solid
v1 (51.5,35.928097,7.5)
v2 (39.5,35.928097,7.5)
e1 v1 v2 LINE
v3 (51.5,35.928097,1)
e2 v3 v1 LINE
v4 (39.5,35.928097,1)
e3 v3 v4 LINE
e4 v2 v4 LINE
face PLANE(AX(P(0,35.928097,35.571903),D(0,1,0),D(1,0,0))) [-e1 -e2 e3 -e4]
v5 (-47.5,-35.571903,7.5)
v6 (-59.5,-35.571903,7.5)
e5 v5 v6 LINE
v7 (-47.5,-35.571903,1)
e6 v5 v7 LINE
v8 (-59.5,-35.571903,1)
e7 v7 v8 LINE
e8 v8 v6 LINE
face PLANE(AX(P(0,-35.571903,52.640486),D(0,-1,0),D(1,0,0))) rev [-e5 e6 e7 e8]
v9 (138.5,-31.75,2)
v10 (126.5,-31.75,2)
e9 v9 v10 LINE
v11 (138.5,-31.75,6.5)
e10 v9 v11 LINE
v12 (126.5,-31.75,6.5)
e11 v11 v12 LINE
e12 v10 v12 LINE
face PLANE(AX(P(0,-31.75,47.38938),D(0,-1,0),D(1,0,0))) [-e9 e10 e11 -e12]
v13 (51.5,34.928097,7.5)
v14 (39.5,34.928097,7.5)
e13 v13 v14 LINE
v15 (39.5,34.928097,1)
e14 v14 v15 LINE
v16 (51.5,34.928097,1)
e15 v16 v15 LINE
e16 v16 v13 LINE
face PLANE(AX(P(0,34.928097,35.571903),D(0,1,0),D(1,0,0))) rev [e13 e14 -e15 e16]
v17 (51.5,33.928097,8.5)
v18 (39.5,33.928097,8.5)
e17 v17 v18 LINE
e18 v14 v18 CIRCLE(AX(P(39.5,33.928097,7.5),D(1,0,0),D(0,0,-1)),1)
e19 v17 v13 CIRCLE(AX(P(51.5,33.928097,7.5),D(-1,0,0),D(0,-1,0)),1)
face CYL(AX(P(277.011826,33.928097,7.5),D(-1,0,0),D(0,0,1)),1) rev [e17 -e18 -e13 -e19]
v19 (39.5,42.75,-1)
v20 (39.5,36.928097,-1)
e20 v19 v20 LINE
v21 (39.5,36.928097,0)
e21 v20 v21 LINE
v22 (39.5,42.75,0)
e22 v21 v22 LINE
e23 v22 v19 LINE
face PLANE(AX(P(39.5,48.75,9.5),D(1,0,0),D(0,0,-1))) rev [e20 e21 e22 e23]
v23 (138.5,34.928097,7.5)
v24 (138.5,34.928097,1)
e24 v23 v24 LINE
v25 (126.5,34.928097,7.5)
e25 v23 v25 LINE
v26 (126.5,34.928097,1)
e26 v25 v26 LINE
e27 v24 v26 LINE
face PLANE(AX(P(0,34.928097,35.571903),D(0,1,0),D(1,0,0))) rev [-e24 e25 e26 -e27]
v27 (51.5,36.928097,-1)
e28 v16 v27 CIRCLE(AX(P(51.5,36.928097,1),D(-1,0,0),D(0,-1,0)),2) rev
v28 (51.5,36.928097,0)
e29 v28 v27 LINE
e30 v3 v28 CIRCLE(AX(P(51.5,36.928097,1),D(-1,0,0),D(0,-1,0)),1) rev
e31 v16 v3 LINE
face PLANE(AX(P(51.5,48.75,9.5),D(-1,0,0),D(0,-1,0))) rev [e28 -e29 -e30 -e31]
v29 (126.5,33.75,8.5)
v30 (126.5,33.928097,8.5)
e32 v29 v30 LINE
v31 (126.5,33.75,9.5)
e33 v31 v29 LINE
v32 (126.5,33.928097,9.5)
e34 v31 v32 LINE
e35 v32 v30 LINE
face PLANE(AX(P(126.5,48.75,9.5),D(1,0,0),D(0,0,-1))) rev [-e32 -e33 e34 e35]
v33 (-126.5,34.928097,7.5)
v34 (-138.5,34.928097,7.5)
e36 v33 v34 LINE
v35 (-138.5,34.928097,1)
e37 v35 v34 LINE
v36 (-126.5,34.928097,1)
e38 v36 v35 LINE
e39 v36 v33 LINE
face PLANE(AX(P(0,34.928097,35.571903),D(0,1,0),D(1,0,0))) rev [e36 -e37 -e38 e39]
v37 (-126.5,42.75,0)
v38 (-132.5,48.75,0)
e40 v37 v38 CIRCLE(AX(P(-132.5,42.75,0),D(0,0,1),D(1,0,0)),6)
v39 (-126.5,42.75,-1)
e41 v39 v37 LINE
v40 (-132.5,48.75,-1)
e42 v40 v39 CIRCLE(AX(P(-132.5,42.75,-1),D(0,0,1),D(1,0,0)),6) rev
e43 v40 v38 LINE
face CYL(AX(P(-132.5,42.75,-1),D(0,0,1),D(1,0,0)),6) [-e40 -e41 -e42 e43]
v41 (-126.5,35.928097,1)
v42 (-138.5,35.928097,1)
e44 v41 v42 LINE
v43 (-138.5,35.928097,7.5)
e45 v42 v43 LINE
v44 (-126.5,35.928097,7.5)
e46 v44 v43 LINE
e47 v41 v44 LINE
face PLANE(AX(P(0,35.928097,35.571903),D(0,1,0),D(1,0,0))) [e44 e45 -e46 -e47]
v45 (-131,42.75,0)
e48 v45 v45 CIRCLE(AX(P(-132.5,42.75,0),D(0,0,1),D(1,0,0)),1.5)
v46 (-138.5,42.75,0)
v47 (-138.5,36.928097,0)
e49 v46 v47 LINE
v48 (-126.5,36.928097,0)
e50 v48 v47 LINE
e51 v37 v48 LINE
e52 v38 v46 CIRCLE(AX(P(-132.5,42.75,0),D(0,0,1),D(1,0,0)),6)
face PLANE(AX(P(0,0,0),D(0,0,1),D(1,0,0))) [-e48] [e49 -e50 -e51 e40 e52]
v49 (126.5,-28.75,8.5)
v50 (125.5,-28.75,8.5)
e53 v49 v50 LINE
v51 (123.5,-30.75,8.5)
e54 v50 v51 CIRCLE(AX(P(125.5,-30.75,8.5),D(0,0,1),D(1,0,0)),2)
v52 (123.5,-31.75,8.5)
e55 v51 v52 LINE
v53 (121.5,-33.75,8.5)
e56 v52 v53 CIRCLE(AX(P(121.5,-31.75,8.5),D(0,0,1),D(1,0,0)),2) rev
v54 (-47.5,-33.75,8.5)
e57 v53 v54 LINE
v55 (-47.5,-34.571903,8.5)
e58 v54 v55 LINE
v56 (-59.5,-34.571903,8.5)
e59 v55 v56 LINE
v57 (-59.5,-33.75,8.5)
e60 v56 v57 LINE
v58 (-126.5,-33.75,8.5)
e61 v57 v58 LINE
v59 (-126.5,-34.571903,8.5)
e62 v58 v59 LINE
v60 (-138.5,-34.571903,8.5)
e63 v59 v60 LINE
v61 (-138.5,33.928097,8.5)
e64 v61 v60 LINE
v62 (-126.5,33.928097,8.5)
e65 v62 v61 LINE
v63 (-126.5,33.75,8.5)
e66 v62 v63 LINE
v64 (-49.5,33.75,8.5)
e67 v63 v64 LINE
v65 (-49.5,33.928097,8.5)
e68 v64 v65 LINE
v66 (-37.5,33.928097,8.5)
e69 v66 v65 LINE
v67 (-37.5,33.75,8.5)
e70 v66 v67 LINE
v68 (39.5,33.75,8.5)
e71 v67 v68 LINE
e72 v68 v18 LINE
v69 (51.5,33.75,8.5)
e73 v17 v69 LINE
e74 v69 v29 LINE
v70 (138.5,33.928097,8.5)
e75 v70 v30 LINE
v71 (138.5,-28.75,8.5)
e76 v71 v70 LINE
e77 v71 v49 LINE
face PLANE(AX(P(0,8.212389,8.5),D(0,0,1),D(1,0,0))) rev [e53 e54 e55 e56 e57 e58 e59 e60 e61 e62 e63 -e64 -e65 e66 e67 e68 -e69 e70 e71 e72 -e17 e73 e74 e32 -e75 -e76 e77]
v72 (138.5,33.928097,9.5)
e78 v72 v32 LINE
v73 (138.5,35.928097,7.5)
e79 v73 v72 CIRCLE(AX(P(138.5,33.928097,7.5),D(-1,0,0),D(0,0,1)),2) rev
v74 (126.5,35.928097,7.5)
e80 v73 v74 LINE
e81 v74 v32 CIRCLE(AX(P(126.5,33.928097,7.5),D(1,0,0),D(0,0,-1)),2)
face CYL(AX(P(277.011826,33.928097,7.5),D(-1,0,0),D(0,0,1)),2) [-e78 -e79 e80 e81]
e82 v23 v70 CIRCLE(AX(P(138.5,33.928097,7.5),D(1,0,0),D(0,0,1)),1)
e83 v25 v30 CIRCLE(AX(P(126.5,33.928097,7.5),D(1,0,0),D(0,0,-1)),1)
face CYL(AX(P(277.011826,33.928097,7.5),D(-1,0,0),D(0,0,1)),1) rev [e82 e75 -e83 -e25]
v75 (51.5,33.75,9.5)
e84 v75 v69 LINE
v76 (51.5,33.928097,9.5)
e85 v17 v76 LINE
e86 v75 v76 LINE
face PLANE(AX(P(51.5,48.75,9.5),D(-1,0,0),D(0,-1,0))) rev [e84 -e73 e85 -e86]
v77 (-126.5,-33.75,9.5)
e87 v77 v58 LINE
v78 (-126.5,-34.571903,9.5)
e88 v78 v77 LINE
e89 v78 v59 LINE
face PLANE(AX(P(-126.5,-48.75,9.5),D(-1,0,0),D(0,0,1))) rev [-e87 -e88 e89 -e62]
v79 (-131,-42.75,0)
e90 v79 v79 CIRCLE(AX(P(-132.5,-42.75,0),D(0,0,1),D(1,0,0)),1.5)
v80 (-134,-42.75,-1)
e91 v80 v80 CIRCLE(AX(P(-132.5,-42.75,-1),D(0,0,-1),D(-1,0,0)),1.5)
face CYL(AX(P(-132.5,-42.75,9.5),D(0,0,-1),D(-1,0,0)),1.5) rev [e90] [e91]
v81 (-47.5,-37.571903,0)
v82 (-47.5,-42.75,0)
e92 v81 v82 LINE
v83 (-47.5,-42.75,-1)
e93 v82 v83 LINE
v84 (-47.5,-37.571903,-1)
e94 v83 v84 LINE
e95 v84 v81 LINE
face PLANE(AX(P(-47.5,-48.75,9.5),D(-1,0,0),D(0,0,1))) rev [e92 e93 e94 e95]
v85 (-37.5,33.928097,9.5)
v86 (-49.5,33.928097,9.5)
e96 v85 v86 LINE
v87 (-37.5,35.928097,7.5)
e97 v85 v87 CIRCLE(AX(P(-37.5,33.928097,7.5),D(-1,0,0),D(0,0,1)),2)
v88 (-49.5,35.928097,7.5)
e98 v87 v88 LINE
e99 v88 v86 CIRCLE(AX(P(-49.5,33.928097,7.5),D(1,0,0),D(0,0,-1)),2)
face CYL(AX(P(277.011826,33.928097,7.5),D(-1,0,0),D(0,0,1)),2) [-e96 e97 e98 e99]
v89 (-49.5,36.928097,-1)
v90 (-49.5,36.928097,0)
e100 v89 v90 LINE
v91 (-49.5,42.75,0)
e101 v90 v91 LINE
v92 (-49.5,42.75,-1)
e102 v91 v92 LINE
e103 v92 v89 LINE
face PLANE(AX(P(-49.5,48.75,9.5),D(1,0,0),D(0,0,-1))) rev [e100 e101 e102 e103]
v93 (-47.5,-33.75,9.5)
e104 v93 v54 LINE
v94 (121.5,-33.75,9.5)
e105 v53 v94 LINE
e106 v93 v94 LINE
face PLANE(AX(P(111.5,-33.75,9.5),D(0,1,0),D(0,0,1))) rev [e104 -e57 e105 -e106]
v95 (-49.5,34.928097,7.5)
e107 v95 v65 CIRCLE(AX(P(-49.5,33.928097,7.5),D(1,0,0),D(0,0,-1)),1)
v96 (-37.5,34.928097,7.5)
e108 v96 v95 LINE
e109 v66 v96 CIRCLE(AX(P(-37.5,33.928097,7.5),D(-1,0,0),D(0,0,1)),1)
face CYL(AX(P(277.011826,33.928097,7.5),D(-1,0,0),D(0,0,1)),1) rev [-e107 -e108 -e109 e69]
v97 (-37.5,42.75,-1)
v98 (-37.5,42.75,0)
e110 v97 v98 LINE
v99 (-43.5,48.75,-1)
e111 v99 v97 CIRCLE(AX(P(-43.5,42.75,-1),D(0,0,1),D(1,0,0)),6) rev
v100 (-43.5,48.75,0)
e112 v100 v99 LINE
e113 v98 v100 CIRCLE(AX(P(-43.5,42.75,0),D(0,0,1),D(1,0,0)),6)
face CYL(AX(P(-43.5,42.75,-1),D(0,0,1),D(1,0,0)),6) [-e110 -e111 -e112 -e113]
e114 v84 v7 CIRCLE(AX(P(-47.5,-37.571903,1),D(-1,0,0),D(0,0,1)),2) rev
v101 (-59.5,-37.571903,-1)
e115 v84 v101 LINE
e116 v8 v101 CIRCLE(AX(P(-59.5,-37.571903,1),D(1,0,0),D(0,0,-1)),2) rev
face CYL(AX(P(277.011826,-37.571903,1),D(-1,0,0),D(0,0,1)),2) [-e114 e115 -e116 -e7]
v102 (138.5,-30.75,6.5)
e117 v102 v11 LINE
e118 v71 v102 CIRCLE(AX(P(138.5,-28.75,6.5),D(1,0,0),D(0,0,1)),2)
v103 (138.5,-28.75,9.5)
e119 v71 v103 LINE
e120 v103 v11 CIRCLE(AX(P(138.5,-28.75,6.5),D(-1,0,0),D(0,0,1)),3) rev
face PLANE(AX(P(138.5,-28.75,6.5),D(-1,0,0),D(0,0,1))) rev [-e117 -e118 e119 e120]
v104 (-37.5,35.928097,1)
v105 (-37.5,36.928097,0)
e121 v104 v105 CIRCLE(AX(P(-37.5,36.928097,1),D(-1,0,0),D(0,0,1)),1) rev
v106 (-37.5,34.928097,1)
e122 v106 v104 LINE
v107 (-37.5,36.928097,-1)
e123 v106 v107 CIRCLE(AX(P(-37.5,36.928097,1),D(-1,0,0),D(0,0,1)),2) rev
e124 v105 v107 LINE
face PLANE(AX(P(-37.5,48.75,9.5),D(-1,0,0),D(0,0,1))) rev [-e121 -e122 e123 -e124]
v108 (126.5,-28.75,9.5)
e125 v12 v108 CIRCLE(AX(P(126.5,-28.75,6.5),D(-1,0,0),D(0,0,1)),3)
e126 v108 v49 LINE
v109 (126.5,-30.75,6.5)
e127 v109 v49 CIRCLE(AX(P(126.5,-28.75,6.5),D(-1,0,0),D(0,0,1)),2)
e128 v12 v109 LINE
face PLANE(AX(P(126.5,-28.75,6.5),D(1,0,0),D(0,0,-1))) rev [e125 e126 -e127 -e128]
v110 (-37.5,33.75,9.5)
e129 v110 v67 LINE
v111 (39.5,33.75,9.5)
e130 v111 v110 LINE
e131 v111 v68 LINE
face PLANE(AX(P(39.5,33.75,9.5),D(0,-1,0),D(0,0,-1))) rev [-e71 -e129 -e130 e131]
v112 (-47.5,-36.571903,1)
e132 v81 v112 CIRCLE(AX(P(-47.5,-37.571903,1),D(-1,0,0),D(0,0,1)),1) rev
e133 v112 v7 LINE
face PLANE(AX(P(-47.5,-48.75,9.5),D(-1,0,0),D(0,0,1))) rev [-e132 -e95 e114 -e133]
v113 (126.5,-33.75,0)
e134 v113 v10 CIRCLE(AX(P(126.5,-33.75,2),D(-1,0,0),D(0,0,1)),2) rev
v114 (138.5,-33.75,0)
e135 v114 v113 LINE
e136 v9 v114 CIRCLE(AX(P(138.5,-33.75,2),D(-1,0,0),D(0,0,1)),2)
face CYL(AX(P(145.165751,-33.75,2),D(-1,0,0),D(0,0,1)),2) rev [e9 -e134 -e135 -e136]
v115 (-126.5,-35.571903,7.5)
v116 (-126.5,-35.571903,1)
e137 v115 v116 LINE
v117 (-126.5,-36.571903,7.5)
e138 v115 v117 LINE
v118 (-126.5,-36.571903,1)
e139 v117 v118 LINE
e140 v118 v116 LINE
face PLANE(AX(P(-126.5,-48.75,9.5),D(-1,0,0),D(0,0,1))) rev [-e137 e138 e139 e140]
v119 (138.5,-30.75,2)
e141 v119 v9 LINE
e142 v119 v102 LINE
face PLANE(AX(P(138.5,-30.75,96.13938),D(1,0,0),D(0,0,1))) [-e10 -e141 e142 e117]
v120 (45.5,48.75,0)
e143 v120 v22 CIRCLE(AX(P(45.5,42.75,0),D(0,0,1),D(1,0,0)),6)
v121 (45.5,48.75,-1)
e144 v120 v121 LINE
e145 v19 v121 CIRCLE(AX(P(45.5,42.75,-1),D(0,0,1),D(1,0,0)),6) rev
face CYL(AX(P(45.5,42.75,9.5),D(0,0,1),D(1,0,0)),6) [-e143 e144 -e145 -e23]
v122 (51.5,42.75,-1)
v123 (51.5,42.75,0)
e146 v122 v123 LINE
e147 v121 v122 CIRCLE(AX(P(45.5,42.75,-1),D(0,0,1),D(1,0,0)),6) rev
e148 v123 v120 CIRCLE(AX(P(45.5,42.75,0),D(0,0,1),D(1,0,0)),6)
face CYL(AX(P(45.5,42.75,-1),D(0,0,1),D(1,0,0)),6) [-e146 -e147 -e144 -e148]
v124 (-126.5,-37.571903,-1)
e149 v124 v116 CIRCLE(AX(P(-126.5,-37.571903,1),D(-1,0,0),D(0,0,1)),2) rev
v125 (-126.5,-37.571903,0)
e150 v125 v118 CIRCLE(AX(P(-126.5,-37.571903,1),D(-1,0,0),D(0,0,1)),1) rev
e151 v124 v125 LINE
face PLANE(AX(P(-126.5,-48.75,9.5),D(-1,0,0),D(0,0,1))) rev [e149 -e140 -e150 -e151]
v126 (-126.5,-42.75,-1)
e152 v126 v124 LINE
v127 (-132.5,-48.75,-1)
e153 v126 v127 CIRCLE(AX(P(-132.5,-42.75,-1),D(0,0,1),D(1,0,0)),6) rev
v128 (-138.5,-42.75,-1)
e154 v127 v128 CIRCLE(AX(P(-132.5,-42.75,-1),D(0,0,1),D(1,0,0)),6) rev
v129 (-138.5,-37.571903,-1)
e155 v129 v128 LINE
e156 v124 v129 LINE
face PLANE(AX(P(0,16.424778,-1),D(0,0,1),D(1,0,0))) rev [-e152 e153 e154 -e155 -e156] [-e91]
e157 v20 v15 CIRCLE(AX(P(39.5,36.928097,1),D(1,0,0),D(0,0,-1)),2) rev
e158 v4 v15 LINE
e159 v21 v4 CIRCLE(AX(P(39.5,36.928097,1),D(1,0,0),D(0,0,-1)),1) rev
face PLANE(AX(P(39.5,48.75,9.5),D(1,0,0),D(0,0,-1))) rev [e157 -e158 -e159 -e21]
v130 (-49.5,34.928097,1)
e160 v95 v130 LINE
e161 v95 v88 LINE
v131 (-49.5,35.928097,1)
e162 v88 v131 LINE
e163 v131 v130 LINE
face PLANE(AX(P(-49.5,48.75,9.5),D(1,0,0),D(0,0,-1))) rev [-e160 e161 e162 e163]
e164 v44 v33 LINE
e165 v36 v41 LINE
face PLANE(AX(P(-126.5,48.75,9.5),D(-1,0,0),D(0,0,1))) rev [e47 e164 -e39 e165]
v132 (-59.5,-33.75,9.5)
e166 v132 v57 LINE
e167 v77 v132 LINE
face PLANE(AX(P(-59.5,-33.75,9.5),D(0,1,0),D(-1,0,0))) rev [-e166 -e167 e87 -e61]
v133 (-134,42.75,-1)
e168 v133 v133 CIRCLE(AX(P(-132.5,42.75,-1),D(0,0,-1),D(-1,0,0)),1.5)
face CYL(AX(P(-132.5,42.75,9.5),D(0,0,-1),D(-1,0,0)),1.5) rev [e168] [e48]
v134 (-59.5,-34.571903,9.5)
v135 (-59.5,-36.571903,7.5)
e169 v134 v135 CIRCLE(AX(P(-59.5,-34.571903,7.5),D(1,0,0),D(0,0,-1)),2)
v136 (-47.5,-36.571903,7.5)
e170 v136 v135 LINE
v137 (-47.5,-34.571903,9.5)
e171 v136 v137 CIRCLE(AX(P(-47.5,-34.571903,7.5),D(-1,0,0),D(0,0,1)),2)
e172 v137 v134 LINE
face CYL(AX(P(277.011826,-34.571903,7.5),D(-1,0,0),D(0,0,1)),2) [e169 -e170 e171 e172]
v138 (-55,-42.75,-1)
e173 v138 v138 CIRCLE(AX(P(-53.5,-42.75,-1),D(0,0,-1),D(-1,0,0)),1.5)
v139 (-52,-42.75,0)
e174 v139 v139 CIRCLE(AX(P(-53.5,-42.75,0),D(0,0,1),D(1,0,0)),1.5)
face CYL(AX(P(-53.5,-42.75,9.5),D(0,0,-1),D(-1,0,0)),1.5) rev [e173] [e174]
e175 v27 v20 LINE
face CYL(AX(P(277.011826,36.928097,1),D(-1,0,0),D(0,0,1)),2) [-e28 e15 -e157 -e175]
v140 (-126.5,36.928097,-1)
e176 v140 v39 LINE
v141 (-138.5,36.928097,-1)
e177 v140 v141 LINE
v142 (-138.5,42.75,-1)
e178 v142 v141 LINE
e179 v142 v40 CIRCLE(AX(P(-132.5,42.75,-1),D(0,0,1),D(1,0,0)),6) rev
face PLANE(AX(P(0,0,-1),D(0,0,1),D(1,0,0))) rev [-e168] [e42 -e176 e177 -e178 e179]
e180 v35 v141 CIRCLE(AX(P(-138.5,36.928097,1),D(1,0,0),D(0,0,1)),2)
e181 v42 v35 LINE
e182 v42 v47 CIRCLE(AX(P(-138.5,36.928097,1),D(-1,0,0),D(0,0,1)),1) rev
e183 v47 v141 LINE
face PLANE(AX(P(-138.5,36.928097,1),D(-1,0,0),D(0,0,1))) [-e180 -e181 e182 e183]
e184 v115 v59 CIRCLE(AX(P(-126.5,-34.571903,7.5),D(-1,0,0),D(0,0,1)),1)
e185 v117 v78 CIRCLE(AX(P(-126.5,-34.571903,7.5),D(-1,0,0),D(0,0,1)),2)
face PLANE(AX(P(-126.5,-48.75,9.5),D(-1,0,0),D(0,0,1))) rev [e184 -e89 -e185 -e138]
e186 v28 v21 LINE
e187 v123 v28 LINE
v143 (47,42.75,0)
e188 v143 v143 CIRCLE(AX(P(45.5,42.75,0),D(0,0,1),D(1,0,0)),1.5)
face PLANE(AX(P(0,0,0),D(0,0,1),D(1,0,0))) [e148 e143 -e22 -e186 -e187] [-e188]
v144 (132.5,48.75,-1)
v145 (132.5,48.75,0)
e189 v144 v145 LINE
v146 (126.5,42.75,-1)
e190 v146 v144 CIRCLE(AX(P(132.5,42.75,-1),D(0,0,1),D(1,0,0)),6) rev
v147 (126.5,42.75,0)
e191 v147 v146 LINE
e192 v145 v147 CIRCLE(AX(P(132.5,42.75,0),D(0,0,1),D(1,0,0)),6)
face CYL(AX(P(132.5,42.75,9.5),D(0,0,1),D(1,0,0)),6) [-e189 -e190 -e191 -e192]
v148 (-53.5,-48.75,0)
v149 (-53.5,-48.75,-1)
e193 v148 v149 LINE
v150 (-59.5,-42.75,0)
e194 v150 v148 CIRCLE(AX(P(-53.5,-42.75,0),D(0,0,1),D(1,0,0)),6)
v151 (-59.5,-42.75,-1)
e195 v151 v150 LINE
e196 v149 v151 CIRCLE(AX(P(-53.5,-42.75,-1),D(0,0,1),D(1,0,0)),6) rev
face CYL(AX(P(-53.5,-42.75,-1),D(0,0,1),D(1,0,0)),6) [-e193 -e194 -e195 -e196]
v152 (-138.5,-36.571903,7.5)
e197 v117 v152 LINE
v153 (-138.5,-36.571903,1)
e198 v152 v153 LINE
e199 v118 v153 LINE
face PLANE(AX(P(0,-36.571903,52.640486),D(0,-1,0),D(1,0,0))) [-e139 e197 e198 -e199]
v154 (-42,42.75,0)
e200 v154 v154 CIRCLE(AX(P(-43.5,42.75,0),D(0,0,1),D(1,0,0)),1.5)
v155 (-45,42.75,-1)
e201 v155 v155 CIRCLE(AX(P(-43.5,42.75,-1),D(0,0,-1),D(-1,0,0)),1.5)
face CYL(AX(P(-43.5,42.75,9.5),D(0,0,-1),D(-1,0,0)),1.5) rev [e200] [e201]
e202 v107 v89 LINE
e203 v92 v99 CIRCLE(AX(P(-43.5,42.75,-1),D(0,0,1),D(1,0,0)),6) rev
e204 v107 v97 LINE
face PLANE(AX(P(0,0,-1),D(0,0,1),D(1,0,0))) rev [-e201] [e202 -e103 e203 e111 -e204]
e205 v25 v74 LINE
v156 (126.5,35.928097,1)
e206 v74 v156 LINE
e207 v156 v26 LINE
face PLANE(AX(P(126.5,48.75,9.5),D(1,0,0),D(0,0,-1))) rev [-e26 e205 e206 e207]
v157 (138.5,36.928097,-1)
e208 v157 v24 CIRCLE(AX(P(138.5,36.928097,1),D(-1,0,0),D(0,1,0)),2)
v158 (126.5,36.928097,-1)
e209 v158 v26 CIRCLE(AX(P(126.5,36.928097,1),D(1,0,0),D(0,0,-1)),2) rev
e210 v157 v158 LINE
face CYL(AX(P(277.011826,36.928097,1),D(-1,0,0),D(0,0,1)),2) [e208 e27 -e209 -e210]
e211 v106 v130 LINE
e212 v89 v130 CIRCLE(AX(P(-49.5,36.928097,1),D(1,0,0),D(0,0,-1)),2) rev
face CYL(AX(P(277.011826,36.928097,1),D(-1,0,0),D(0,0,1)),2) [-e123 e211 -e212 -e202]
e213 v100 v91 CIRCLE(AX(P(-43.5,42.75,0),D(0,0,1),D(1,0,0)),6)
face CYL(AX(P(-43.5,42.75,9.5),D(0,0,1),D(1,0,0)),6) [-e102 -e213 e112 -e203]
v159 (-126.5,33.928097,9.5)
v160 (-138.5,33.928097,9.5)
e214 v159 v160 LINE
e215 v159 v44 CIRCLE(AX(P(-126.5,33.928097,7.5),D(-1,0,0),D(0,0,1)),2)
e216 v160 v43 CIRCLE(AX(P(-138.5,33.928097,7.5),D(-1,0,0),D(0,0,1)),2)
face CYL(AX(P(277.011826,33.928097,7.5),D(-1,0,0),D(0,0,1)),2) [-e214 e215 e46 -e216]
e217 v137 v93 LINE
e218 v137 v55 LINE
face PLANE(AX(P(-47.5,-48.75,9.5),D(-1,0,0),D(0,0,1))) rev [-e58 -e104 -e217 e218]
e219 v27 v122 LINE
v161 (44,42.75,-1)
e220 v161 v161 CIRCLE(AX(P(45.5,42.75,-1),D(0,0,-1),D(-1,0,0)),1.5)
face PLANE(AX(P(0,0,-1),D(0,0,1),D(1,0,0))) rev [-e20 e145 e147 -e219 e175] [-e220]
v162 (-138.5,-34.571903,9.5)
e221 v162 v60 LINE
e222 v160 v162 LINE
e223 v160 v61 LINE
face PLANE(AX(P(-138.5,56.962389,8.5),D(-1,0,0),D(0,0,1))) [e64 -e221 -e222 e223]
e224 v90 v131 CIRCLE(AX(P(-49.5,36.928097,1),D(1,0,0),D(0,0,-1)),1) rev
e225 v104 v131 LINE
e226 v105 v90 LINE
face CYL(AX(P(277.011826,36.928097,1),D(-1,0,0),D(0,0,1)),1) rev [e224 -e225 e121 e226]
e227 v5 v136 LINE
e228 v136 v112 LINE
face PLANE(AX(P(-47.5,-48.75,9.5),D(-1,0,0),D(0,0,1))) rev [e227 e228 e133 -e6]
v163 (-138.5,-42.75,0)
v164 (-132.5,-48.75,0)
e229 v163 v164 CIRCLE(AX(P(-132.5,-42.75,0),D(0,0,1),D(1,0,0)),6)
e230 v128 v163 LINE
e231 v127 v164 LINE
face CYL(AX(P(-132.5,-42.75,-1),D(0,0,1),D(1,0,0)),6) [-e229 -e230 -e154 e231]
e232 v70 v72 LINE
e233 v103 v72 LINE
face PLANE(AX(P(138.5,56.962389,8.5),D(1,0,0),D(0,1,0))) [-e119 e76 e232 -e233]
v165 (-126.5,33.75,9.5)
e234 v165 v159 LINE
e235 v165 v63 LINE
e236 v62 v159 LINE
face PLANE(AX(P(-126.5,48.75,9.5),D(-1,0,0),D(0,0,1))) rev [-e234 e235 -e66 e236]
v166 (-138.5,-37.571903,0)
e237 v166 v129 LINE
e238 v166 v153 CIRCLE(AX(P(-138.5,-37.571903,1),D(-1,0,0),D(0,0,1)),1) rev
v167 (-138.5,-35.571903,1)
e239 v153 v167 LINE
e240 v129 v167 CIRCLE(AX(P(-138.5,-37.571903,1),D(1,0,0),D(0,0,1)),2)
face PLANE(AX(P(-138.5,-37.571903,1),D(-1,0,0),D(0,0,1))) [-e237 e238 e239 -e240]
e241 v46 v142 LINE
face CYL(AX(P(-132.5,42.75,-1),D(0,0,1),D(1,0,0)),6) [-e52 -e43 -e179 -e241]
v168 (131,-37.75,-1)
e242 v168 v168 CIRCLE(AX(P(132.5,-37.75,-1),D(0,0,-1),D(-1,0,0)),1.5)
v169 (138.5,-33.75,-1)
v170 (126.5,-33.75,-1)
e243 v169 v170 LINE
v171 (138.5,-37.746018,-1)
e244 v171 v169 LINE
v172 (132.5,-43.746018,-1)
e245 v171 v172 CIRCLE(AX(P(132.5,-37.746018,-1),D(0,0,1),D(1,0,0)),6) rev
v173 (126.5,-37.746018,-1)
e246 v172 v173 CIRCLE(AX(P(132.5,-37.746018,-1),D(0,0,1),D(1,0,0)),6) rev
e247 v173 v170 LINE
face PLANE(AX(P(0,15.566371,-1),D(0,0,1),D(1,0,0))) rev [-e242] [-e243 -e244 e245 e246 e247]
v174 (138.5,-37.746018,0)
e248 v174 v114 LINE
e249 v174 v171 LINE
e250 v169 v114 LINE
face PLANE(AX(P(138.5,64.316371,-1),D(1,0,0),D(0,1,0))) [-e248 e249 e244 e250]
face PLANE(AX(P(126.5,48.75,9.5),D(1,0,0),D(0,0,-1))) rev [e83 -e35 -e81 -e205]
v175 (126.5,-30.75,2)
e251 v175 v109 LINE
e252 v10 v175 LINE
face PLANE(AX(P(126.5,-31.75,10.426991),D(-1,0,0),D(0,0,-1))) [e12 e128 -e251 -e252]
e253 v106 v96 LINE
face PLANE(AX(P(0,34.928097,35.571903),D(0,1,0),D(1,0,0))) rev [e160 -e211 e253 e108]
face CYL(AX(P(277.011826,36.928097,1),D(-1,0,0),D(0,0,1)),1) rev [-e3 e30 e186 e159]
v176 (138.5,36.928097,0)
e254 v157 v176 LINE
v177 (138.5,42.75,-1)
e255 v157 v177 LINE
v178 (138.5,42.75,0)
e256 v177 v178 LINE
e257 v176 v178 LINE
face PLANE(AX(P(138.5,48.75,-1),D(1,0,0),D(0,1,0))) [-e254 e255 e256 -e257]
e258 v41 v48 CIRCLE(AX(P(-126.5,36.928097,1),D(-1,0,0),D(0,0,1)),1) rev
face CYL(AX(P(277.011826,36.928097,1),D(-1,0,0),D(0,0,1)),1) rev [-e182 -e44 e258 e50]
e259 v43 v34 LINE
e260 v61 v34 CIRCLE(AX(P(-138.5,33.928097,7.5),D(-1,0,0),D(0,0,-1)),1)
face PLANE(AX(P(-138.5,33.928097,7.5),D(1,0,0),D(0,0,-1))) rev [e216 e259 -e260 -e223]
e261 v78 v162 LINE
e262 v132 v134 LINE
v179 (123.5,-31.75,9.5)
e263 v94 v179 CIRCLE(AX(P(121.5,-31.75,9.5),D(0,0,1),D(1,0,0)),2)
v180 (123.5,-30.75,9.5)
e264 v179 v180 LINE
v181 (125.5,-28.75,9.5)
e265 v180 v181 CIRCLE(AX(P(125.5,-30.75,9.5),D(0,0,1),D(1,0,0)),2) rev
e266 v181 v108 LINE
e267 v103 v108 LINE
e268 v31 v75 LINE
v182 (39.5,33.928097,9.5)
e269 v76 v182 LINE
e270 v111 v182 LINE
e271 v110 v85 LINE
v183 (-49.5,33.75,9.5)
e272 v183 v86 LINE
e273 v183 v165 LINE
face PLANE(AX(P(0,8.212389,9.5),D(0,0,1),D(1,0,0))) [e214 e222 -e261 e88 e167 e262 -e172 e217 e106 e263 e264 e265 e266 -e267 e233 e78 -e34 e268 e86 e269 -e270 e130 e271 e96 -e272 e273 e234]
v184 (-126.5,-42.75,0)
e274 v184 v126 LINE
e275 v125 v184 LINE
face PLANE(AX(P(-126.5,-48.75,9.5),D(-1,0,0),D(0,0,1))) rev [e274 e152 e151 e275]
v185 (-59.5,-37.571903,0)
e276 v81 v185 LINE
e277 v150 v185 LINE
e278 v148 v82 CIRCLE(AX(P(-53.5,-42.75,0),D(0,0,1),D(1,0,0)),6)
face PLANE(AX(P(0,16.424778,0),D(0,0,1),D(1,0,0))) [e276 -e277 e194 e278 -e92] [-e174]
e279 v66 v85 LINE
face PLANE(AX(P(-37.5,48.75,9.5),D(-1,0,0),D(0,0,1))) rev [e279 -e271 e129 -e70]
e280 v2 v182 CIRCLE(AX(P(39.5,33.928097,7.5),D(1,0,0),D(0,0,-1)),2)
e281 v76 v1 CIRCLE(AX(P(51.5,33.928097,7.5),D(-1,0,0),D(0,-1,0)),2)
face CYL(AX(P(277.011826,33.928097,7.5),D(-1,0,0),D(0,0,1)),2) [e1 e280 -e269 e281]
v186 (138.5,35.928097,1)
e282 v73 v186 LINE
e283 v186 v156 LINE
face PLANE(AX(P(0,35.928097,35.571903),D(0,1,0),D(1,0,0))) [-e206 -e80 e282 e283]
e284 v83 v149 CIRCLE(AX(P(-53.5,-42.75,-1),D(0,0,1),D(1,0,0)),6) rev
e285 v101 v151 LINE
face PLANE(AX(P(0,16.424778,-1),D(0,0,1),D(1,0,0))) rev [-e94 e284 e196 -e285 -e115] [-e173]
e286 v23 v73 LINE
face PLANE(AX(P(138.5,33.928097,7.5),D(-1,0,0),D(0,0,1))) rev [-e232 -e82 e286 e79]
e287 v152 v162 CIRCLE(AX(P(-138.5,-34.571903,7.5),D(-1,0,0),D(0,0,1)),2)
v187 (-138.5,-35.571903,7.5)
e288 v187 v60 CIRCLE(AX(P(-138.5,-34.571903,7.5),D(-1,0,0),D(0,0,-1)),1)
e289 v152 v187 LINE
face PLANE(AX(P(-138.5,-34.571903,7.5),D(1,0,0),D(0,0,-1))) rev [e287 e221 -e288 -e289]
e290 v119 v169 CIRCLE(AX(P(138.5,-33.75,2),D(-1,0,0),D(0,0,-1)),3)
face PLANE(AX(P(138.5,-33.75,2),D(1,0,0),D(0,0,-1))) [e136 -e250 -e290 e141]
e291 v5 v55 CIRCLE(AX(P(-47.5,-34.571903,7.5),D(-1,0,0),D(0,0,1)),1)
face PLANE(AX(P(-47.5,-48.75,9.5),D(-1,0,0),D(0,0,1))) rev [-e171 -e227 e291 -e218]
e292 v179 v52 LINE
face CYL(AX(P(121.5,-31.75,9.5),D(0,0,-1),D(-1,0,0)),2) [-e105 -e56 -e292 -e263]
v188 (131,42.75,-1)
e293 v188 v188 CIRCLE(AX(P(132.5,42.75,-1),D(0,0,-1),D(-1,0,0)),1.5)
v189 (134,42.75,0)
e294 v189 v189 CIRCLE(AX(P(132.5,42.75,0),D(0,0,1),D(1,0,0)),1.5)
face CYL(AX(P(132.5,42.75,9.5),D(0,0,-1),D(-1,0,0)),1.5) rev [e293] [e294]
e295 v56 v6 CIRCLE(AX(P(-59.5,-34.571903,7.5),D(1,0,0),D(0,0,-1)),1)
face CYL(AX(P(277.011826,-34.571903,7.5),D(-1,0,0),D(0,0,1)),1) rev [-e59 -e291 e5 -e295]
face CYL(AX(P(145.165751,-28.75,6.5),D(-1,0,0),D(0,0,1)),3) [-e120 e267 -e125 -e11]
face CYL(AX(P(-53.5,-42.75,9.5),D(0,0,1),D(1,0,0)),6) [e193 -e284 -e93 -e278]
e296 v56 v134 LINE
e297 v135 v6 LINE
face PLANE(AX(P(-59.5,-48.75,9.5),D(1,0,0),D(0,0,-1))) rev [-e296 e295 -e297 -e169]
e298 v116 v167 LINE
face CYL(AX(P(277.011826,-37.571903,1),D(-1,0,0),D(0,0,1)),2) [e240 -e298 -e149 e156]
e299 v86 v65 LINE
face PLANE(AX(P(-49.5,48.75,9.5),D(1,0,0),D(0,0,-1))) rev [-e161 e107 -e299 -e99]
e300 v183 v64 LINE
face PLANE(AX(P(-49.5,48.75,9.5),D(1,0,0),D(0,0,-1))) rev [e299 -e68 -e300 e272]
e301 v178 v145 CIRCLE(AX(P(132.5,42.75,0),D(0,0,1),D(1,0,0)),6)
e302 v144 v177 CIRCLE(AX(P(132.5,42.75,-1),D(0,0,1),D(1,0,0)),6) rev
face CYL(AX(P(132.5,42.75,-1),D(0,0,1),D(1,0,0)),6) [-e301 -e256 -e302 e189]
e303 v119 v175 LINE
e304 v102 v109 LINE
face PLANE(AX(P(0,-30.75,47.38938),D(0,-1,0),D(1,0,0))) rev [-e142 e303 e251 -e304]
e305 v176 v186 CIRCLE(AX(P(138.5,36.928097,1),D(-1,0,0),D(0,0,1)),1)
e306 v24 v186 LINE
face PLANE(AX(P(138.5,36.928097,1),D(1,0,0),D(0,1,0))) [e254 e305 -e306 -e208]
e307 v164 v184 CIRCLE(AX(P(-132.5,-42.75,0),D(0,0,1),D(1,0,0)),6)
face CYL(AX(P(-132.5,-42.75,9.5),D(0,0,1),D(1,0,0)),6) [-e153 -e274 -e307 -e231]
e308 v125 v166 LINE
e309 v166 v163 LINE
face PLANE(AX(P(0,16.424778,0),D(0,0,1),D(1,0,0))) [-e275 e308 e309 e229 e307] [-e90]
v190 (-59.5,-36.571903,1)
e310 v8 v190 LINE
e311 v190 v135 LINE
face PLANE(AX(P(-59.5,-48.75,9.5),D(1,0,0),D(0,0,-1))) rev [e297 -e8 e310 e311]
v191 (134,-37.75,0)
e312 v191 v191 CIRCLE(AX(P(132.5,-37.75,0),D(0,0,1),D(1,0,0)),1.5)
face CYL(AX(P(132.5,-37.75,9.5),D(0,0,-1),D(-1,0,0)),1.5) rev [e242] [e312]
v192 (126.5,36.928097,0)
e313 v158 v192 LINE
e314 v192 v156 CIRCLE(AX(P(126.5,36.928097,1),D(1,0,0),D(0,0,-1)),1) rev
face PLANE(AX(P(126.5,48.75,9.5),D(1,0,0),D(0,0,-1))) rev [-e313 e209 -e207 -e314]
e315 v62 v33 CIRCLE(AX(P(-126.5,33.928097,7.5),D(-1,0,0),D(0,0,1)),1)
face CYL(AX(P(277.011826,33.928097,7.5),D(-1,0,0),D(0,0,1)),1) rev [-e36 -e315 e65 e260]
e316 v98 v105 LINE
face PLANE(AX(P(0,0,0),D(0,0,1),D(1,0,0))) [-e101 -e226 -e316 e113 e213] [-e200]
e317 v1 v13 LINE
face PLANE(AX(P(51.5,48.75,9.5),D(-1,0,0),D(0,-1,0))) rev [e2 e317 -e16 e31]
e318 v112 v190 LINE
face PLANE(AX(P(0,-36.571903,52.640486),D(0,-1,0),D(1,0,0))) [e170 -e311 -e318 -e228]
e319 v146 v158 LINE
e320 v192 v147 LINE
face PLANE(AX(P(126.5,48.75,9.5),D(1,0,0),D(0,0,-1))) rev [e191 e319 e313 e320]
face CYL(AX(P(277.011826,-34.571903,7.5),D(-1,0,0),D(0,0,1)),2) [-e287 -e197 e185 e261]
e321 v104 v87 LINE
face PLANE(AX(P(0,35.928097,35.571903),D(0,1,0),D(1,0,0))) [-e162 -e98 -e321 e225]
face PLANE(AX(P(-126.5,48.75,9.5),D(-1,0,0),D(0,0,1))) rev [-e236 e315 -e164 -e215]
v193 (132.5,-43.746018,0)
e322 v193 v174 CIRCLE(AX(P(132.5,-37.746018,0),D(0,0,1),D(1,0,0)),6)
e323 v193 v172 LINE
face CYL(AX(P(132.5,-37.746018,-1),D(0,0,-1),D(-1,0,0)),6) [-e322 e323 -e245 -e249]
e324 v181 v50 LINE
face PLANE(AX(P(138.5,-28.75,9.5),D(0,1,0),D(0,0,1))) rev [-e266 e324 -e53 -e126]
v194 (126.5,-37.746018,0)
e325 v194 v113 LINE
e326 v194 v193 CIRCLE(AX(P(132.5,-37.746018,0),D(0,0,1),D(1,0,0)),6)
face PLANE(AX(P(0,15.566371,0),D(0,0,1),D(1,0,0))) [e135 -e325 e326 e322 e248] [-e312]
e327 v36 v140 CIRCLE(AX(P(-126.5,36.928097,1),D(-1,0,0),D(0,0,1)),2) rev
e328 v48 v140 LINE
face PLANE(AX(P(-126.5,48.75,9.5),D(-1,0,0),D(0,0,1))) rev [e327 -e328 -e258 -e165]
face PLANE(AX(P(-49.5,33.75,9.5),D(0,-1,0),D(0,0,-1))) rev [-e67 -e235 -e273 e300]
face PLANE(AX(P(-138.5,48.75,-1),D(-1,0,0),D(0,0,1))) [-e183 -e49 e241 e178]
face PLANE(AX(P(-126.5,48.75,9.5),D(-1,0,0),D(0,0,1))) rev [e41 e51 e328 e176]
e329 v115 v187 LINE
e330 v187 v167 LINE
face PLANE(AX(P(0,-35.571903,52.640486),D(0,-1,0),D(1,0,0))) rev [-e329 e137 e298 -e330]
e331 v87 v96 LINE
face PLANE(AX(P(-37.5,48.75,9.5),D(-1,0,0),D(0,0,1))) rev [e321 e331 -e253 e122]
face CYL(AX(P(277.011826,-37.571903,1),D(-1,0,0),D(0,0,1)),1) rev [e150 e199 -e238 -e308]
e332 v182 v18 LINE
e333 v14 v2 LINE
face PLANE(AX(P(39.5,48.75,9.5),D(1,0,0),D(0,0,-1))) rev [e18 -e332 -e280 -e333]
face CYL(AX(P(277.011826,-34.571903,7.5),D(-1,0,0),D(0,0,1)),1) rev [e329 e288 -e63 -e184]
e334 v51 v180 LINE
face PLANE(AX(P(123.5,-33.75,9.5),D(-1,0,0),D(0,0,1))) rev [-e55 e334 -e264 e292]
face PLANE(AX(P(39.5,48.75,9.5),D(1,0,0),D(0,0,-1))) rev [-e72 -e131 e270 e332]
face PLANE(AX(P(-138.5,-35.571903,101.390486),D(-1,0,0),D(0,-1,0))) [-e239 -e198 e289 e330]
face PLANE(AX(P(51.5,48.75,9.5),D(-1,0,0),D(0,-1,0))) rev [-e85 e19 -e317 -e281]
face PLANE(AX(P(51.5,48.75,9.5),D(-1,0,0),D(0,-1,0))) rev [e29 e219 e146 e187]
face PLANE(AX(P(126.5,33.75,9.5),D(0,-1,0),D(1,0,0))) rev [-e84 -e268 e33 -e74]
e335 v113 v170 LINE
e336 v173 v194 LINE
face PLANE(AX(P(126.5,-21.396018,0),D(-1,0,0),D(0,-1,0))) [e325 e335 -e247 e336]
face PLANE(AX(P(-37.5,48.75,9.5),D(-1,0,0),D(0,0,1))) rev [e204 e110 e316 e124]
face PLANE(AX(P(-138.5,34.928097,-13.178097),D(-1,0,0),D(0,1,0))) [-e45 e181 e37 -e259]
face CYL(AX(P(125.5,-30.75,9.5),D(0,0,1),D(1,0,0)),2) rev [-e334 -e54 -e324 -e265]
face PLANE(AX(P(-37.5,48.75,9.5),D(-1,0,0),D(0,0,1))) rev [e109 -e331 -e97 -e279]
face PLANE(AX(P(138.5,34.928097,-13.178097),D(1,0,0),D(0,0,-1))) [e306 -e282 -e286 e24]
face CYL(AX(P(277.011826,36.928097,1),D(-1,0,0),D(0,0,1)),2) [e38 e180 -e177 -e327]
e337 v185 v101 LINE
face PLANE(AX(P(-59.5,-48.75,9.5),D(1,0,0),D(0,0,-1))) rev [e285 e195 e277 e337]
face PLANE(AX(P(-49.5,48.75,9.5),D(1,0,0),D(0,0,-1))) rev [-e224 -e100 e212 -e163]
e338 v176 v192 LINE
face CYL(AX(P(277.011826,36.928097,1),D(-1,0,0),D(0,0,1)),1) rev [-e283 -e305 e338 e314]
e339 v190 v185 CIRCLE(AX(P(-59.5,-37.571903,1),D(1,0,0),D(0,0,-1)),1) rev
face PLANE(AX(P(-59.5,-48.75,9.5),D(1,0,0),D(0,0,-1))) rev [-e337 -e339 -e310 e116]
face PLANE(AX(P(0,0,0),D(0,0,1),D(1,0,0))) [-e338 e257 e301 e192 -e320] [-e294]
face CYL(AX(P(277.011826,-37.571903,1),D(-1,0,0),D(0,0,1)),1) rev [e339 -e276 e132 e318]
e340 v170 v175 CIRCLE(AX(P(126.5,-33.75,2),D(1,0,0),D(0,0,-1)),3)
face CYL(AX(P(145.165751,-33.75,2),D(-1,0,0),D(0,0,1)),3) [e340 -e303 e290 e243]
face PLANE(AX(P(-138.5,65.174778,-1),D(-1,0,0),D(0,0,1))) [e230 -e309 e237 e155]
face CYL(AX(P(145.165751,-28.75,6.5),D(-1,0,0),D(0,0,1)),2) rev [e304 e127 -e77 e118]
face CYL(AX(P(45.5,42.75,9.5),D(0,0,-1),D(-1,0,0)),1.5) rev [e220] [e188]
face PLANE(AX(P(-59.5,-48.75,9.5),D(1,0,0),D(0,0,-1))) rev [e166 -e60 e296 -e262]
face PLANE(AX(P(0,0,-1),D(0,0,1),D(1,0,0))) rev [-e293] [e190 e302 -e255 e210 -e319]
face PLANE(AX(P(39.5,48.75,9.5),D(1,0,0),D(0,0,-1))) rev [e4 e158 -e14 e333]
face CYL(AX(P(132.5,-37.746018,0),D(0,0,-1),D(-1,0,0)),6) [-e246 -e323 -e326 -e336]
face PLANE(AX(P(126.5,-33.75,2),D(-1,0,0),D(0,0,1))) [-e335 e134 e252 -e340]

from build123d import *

# Parameters (mm, degrees)
SKETCH1_W          = 277
SKETCH1_H          = 97.5
BASE_FLANGE1_DEPTH = 1
JOG1_START         = -138.5
JOG1_DEPTH         = 277
JOG1_2_DEPTH       = 277
JOG2_START         = -138.5
JOG2_DEPTH         = 277
JOG2_2_DEPTH       = 277
SKETCH11_W         = 67
SKETCH11_H         = 15
SKETCH11_W_2       = 75
SKETCH11_W_3       = 77
CUT_EXTRUDE1_DEPTH = 148.204152455
SKETCH16_W         = 12
SKETCH16_H         = 22.35
TAB1_DEPTH         = 1
JOG4_START         = 126.5
JOG4_DEPTH         = 12
JOG4_2_DEPTH       = 12
SKETCH22_R         = 1.5
SCREW_HOLES_DEPTH  = 148.204152455
FILLET1_R          = 6
FILLET2_R          = 2


# Read off the part's stored shape, not the designer's step: Jog1, Jog2, Jog4
# Sheet-metal steps are written as plain solids
with BuildPart() as part:
    # Sketch1 → Base-Flange1 (new body)
    with BuildSketch(Plane.XY):
        Rectangle(SKETCH1_W, SKETCH1_H)
    extrude(amount=-BASE_FLANGE1_DEPTH)

    # Jog1 outline → Jog1 (cut)
    with BuildSketch(Plane.YZ.offset(JOG1_START)):
        with BuildLine():
            ThreePointArc((36.928097245, -1), (35.928097245, -0.732050807), (35.196046438, 0))
            Line((35.196046438, 0), (-48.75, 0))
            Line((-48.75, 0), (-48.75, -1))
            Line((-48.75, -1), (36.928097245, -1))
        make_face()
    extrude(amount=JOG1_DEPTH, mode=Mode.SUBTRACT)

    # Jog1 2 outline → Jog1 2 (add)
    with BuildSketch(Plane.YZ.offset(JOG1_START)):
        with BuildLine():
            Line((34.928097245, 7.5), (34.928097245, 1))
            ThreePointArc((34.928097245, 1), (34.996245593, 0.48236191), (35.196046438, 0))
            Line((35.196046438, 0), (36.928097245, 0))
            ThreePointArc((36.928097245, 0), (36.220990464, 0.292893219), (35.928097245, 1))
            Line((35.928097245, 1), (35.928097245, 7.5))
            ThreePointArc((35.928097245, 7.5), (35.342310807, 8.914213562), (33.928097245, 9.5))
            Line((33.928097245, 9.5), (-48.75, 9.5))
            Line((-48.75, 9.5), (-48.75, 8.5))
            Line((-48.75, 8.5), (33.928097245, 8.5))
            ThreePointArc((33.928097245, 8.5), (34.635204026, 8.207106781), (34.928097245, 7.5))
        make_face()
    extrude(amount=JOG1_2_DEPTH)

    # Jog2 outline → Jog2 (cut)
    with BuildSketch(Plane.YZ.offset(JOG2_START)):
        with BuildLine():
            Line((-48.75, 8.5), (-36.303953562, 8.5))
            ThreePointArc((-36.303953562, 8.5), (-35.571902755, 9.232050807), (-34.571902755, 9.5))
            Line((-34.571902755, 9.5), (-48.75, 9.5))
            Line((-48.75, 9.5), (-48.75, 8.5))
        make_face()
    extrude(amount=JOG2_DEPTH, mode=Mode.SUBTRACT)

    # Jog2 2 outline → Jog2 2 (add)
    with BuildSketch(Plane.YZ.offset(JOG2_START)):
        with BuildLine():
            Line((-48.75, -1), (-37.571902755, -1))
            ThreePointArc((-37.571902755, -1), (-36.157689193, -0.414213562), (-35.571902755, 1))
            Line((-35.571902755, 1), (-35.571902755, 7.5))
            ThreePointArc((-35.571902755, 7.5), (-35.279009536, 8.207106781), (-34.571902755, 8.5))
            Line((-34.571902755, 8.5), (-36.303953562, 8.5))
            ThreePointArc((-36.303953562, 8.5), (-36.503754407, 8.01763809), (-36.571902755, 7.5))
            Line((-36.571902755, 7.5), (-36.571902755, 1))
            ThreePointArc((-36.571902755, 1), (-36.864795974, 0.292893219), (-37.571902755, 0))
            Line((-37.571902755, 0), (-48.75, 0))
            Line((-48.75, 0), (-48.75, -1))
        make_face()
    extrude(amount=JOG2_2_DEPTH)

    # Sketch11 → Cut-Extrude1 (cut, through all)
    with BuildSketch(Plane(origin=(0, 0, -1), x_dir=(-1, 0, 0), z_dir=(0, 0, -1))):
        Polygon((-138.5, -48.75), (-123.5, -48.75), (-111.5, -48.75), (47.5, -48.75), (47.5, -33.75), (-111.5, -33.75), (-123.5, -33.75), (-123.5, -28.75), (-138.5, -28.75), align=None)
        with Locations((93, -41.25)):
            Rectangle(SKETCH11_W, SKETCH11_H)
        with Locations((-89, 41.25)):
            Rectangle(SKETCH11_W_2, SKETCH11_H)
        with Locations((-1, 41.25)):
            Rectangle(SKETCH11_W_3, SKETCH11_H)
        with Locations((88, 41.25)):
            Rectangle(SKETCH11_W_3, SKETCH11_H)
    extrude(amount=-CUT_EXTRUDE1_DEPTH, mode=Mode.SUBTRACT)

    # Sketch16 → Tab1 (add)
    with BuildSketch(Plane(origin=(0, 0, 8.5), x_dir=(-1, 0, 0), z_dir=(0, 0, -1))):
        with Locations((-132.5, -39.925)):
            Rectangle(SKETCH16_W, SKETCH16_H)
    extrude(amount=-TAB1_DEPTH)

    # Jog4 outline → Jog4 (cut)
    with BuildSketch(Plane.YZ.offset(JOG4_START)):
        with BuildLine():
            Line((-51.1, 8.5), (-30.986067978, 8.5))
            ThreePointArc((-30.986067978, 8.5), (-29.974744872, 9.238612788), (-28.75, 9.5))
            Line((-28.75, 9.5), (-51.1, 9.5))
            Line((-51.1, 9.5), (-51.1, 8.5))
        make_face()
    extrude(amount=JOG4_DEPTH, mode=Mode.SUBTRACT)

    # Jog4 2 outline → Jog4 2 (add)
    with BuildSketch(Plane.YZ.offset(JOG4_START)):
        with BuildLine():
            Line((-43.746018366, -1), (-33.75, -1))
            ThreePointArc((-33.75, -1), (-31.628679656, -0.121320344), (-30.75, 2))
            Line((-30.75, 2), (-30.75, 6.5))
            ThreePointArc((-30.75, 6.5), (-30.164213562, 7.914213562), (-28.75, 8.5))
            Line((-28.75, 8.5), (-30.986067978, 8.5))
            ThreePointArc((-30.986067978, 8.5), (-31.552517077, 7.570466269), (-31.75, 6.5))
            Line((-31.75, 6.5), (-31.75, 2))
            ThreePointArc((-31.75, 2), (-32.335786438, 0.585786438), (-33.75, 0))
            Line((-33.75, 0), (-43.746018366, 0))
            Line((-43.746018366, 0), (-43.746018366, -1))
        make_face()
    extrude(amount=JOG4_2_DEPTH)

    # Sketch22 → SCREW HOLES (cut, through all)
    with BuildSketch(Plane(origin=(0, 0, -1), x_dir=(-1, 0, 0), z_dir=(0, 0, -1))):
        with Locations((132.5, 42.75)):
            Circle(SKETCH22_R)
        with Locations((132.5, -42.75)):
            Circle(SKETCH22_R)
        with Locations((43.5, 42.75)):
            Circle(SKETCH22_R)
        with Locations((53.5, -42.75)):
            Circle(SKETCH22_R)
        with Locations((-45.5, 42.75)):
            Circle(SKETCH22_R)
        with Locations((-132.5, 42.75)):
            Circle(SKETCH22_R)
        with Locations((-132.5, -37.75)):
            Circle(SKETCH22_R)
    extrude(amount=-SCREW_HOLES_DEPTH, mode=Mode.SUBTRACT)

    # Fillet1
    fillet1_edges = [part.edges().sort_by_distance(p)[0] for p in [
        (39.5, 48.75, -0.5),
        (51.5, 48.75, -0.5),
        (-49.5, 48.75, -0.5),
        (-37.5, 48.75, -0.5),
        (-126.5, 48.75, -0.5),
        (-138.5, 48.75, -0.5),
        (-138.5, -48.75, -0.5),
        (-126.5, -48.75, -0.5),
        (-47.5, -48.75, -0.5),
        (-59.5, -48.75, -0.5),
        (138.5, -43.746018366, -0.5),
        (126.5, -43.746018366, -0.5),
        (138.5, 48.75, -0.5),
        (126.5, 48.75, -0.5),
    ]]
    fillet(fillet1_edges, radius=FILLET1_R - 0.0001)  # a hair under: the kernel refuses the full size

    # Fillet2
    fillet2_edges = [part.edges().sort_by_distance(p)[0] for p in [
        (123.5, -28.75, 9),
        (123.5, -33.75, 9),
    ]]
    fillet(fillet2_edges, radius=FILLET2_R)


solid = part.part
